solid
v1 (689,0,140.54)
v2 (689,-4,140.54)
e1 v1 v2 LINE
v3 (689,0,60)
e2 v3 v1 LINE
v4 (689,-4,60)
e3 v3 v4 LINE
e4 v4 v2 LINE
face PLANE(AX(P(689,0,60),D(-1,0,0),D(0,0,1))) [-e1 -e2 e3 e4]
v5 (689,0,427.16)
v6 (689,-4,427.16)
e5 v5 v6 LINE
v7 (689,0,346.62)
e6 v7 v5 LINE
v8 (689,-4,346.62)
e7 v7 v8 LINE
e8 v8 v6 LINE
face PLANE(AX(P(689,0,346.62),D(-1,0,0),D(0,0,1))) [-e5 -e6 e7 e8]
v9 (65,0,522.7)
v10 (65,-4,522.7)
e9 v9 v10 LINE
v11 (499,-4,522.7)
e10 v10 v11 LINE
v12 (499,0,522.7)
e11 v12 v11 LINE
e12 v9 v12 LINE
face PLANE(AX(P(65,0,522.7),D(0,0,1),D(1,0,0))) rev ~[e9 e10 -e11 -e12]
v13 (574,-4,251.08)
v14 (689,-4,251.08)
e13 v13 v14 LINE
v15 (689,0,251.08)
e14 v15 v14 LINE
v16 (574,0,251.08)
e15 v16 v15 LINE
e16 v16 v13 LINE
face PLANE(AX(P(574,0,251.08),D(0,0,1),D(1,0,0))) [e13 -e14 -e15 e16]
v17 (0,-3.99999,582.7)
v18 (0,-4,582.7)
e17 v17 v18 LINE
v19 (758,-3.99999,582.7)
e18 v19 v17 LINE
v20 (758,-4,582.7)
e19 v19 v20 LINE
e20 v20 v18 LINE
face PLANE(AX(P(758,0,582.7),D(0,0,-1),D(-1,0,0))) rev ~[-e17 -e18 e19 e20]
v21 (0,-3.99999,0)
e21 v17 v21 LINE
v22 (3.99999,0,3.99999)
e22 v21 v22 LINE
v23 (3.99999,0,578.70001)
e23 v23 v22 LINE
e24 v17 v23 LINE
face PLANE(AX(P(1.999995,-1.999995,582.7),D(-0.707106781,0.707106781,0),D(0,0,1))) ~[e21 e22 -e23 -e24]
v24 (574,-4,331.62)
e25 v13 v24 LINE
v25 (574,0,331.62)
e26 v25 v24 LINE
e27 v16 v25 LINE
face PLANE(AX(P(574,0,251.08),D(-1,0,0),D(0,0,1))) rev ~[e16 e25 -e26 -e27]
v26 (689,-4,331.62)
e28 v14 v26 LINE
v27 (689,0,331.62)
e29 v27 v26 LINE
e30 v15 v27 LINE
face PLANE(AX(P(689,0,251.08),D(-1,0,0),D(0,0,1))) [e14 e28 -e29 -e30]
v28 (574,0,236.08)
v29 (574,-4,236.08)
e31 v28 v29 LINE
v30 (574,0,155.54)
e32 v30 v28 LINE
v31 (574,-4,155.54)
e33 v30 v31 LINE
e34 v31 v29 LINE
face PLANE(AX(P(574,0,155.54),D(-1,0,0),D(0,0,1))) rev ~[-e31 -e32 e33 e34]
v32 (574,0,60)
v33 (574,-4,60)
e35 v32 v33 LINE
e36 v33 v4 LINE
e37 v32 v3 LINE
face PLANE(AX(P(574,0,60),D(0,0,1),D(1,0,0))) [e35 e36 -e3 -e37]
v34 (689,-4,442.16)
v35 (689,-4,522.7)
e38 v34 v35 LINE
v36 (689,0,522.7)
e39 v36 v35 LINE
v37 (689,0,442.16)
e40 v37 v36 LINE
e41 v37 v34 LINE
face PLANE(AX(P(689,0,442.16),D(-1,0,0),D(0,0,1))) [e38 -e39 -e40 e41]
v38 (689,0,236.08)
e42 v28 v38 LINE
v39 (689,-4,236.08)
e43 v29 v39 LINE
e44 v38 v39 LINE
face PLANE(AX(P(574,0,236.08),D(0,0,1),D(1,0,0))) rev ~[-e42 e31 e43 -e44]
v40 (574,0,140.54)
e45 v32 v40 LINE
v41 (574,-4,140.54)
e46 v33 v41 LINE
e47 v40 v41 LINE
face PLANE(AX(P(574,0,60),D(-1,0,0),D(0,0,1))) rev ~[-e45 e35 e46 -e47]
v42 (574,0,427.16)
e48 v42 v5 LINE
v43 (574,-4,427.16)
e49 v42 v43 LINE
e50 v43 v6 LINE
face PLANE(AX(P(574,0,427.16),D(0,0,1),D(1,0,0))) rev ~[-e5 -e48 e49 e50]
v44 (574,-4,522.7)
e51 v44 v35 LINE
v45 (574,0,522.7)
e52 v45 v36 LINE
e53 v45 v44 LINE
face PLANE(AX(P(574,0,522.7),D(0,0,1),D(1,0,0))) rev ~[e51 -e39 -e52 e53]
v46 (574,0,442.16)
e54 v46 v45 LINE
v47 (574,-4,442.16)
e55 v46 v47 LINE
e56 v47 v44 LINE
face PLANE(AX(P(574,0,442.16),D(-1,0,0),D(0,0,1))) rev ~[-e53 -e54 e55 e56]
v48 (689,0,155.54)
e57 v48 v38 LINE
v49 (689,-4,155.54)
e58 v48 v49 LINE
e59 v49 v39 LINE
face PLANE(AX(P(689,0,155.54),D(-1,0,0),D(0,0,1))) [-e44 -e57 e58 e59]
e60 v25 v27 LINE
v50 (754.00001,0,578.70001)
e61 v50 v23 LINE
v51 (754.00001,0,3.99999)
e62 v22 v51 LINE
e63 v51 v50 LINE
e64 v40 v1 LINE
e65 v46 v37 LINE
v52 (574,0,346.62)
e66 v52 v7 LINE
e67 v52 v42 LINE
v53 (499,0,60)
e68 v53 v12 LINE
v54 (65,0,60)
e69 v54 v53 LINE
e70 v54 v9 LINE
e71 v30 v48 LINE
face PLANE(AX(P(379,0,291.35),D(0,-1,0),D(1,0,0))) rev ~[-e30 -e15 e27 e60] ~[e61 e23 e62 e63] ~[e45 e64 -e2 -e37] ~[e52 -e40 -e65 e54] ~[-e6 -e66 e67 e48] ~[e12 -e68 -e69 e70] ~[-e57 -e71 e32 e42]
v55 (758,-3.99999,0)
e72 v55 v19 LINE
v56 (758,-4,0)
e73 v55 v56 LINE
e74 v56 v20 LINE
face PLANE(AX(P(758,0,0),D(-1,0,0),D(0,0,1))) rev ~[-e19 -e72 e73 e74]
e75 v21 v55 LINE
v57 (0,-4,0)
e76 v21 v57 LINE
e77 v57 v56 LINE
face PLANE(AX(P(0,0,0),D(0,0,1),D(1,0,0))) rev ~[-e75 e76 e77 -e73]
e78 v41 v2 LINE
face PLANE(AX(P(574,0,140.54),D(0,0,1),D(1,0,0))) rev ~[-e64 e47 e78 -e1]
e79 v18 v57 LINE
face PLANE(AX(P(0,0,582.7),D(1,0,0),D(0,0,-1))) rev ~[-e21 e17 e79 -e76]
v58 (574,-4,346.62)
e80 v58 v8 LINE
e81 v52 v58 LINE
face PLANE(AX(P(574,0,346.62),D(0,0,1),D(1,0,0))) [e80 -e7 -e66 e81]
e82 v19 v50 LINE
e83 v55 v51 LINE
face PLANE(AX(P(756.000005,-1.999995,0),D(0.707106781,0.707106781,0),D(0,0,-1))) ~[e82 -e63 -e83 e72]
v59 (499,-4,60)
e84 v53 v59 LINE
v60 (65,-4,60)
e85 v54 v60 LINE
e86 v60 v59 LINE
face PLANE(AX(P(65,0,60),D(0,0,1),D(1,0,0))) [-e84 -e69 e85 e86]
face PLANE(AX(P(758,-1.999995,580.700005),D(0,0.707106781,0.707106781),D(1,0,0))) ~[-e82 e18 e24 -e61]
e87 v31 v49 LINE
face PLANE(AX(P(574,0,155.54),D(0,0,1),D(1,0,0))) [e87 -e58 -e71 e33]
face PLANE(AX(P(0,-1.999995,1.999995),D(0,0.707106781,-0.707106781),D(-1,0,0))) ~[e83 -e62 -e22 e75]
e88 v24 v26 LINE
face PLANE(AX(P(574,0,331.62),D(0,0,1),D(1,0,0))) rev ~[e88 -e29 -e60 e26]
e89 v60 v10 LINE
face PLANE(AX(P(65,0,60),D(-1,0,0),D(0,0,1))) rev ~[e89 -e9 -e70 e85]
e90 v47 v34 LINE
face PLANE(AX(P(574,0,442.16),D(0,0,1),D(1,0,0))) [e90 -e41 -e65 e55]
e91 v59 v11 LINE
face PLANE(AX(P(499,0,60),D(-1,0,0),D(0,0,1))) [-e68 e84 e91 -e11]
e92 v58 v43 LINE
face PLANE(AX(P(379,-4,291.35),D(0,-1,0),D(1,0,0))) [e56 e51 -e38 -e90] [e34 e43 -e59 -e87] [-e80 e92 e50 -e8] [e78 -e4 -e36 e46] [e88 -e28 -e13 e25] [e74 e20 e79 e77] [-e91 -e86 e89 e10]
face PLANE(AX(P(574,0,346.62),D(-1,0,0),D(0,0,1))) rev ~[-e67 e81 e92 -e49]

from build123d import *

# Parameters (mm, degrees)
F0_W     = 115
F0_H     = 80.54
F0_W_2   = 434
F0_H_2   = 462.7
F1_DEPTH = 4
F2_SIZE  = 3.99999


# Not quite as in the source:
# - a fillet or chamfer is up to 0.001 mm smaller than in the source, because OpenCascade refuses the exact size


with BuildPart() as f1:
    # F0 (on Front) → F1 (new body)
    with BuildSketch(Plane.XZ):
        Polygon((0, 582.7), (0, 0), (509, 0), (559, 0), (758, 0), (758, 582.7), (559, 582.7), (509, 582.7), align=None)
        with Locations((631.5, 100.27)):
            Rectangle(F0_W, F0_H, mode=Mode.SUBTRACT)
        with Locations((631.5, 195.81)):
            Rectangle(F0_W, F0_H, mode=Mode.SUBTRACT)
        with Locations((282, 291.35)):
            Rectangle(F0_W_2, F0_H_2, mode=Mode.SUBTRACT)
        with Locations((631.5, 291.35)):
            Rectangle(F0_W, F0_H, mode=Mode.SUBTRACT)
        with Locations((631.5, 386.89)):
            Rectangle(F0_W, F0_H, mode=Mode.SUBTRACT)
        with Locations((631.5, 482.43)):
            Rectangle(F0_W, F0_H, mode=Mode.SUBTRACT)
    extrude(amount=F1_DEPTH)

    # F2 (size 4 in the source; OpenCascade refuses exactly that, so slightly less here)
    f2_edges = [f1.edges().sort_by_distance(p)[0] for p in [
        (379, 0, 0),
        (758, 0, 291.35),
        (0, 0, 291.35),
        (379, 0, 582.7),
    ]]
    chamfer(f2_edges, length=F2_SIZE)


solid = f1.part
